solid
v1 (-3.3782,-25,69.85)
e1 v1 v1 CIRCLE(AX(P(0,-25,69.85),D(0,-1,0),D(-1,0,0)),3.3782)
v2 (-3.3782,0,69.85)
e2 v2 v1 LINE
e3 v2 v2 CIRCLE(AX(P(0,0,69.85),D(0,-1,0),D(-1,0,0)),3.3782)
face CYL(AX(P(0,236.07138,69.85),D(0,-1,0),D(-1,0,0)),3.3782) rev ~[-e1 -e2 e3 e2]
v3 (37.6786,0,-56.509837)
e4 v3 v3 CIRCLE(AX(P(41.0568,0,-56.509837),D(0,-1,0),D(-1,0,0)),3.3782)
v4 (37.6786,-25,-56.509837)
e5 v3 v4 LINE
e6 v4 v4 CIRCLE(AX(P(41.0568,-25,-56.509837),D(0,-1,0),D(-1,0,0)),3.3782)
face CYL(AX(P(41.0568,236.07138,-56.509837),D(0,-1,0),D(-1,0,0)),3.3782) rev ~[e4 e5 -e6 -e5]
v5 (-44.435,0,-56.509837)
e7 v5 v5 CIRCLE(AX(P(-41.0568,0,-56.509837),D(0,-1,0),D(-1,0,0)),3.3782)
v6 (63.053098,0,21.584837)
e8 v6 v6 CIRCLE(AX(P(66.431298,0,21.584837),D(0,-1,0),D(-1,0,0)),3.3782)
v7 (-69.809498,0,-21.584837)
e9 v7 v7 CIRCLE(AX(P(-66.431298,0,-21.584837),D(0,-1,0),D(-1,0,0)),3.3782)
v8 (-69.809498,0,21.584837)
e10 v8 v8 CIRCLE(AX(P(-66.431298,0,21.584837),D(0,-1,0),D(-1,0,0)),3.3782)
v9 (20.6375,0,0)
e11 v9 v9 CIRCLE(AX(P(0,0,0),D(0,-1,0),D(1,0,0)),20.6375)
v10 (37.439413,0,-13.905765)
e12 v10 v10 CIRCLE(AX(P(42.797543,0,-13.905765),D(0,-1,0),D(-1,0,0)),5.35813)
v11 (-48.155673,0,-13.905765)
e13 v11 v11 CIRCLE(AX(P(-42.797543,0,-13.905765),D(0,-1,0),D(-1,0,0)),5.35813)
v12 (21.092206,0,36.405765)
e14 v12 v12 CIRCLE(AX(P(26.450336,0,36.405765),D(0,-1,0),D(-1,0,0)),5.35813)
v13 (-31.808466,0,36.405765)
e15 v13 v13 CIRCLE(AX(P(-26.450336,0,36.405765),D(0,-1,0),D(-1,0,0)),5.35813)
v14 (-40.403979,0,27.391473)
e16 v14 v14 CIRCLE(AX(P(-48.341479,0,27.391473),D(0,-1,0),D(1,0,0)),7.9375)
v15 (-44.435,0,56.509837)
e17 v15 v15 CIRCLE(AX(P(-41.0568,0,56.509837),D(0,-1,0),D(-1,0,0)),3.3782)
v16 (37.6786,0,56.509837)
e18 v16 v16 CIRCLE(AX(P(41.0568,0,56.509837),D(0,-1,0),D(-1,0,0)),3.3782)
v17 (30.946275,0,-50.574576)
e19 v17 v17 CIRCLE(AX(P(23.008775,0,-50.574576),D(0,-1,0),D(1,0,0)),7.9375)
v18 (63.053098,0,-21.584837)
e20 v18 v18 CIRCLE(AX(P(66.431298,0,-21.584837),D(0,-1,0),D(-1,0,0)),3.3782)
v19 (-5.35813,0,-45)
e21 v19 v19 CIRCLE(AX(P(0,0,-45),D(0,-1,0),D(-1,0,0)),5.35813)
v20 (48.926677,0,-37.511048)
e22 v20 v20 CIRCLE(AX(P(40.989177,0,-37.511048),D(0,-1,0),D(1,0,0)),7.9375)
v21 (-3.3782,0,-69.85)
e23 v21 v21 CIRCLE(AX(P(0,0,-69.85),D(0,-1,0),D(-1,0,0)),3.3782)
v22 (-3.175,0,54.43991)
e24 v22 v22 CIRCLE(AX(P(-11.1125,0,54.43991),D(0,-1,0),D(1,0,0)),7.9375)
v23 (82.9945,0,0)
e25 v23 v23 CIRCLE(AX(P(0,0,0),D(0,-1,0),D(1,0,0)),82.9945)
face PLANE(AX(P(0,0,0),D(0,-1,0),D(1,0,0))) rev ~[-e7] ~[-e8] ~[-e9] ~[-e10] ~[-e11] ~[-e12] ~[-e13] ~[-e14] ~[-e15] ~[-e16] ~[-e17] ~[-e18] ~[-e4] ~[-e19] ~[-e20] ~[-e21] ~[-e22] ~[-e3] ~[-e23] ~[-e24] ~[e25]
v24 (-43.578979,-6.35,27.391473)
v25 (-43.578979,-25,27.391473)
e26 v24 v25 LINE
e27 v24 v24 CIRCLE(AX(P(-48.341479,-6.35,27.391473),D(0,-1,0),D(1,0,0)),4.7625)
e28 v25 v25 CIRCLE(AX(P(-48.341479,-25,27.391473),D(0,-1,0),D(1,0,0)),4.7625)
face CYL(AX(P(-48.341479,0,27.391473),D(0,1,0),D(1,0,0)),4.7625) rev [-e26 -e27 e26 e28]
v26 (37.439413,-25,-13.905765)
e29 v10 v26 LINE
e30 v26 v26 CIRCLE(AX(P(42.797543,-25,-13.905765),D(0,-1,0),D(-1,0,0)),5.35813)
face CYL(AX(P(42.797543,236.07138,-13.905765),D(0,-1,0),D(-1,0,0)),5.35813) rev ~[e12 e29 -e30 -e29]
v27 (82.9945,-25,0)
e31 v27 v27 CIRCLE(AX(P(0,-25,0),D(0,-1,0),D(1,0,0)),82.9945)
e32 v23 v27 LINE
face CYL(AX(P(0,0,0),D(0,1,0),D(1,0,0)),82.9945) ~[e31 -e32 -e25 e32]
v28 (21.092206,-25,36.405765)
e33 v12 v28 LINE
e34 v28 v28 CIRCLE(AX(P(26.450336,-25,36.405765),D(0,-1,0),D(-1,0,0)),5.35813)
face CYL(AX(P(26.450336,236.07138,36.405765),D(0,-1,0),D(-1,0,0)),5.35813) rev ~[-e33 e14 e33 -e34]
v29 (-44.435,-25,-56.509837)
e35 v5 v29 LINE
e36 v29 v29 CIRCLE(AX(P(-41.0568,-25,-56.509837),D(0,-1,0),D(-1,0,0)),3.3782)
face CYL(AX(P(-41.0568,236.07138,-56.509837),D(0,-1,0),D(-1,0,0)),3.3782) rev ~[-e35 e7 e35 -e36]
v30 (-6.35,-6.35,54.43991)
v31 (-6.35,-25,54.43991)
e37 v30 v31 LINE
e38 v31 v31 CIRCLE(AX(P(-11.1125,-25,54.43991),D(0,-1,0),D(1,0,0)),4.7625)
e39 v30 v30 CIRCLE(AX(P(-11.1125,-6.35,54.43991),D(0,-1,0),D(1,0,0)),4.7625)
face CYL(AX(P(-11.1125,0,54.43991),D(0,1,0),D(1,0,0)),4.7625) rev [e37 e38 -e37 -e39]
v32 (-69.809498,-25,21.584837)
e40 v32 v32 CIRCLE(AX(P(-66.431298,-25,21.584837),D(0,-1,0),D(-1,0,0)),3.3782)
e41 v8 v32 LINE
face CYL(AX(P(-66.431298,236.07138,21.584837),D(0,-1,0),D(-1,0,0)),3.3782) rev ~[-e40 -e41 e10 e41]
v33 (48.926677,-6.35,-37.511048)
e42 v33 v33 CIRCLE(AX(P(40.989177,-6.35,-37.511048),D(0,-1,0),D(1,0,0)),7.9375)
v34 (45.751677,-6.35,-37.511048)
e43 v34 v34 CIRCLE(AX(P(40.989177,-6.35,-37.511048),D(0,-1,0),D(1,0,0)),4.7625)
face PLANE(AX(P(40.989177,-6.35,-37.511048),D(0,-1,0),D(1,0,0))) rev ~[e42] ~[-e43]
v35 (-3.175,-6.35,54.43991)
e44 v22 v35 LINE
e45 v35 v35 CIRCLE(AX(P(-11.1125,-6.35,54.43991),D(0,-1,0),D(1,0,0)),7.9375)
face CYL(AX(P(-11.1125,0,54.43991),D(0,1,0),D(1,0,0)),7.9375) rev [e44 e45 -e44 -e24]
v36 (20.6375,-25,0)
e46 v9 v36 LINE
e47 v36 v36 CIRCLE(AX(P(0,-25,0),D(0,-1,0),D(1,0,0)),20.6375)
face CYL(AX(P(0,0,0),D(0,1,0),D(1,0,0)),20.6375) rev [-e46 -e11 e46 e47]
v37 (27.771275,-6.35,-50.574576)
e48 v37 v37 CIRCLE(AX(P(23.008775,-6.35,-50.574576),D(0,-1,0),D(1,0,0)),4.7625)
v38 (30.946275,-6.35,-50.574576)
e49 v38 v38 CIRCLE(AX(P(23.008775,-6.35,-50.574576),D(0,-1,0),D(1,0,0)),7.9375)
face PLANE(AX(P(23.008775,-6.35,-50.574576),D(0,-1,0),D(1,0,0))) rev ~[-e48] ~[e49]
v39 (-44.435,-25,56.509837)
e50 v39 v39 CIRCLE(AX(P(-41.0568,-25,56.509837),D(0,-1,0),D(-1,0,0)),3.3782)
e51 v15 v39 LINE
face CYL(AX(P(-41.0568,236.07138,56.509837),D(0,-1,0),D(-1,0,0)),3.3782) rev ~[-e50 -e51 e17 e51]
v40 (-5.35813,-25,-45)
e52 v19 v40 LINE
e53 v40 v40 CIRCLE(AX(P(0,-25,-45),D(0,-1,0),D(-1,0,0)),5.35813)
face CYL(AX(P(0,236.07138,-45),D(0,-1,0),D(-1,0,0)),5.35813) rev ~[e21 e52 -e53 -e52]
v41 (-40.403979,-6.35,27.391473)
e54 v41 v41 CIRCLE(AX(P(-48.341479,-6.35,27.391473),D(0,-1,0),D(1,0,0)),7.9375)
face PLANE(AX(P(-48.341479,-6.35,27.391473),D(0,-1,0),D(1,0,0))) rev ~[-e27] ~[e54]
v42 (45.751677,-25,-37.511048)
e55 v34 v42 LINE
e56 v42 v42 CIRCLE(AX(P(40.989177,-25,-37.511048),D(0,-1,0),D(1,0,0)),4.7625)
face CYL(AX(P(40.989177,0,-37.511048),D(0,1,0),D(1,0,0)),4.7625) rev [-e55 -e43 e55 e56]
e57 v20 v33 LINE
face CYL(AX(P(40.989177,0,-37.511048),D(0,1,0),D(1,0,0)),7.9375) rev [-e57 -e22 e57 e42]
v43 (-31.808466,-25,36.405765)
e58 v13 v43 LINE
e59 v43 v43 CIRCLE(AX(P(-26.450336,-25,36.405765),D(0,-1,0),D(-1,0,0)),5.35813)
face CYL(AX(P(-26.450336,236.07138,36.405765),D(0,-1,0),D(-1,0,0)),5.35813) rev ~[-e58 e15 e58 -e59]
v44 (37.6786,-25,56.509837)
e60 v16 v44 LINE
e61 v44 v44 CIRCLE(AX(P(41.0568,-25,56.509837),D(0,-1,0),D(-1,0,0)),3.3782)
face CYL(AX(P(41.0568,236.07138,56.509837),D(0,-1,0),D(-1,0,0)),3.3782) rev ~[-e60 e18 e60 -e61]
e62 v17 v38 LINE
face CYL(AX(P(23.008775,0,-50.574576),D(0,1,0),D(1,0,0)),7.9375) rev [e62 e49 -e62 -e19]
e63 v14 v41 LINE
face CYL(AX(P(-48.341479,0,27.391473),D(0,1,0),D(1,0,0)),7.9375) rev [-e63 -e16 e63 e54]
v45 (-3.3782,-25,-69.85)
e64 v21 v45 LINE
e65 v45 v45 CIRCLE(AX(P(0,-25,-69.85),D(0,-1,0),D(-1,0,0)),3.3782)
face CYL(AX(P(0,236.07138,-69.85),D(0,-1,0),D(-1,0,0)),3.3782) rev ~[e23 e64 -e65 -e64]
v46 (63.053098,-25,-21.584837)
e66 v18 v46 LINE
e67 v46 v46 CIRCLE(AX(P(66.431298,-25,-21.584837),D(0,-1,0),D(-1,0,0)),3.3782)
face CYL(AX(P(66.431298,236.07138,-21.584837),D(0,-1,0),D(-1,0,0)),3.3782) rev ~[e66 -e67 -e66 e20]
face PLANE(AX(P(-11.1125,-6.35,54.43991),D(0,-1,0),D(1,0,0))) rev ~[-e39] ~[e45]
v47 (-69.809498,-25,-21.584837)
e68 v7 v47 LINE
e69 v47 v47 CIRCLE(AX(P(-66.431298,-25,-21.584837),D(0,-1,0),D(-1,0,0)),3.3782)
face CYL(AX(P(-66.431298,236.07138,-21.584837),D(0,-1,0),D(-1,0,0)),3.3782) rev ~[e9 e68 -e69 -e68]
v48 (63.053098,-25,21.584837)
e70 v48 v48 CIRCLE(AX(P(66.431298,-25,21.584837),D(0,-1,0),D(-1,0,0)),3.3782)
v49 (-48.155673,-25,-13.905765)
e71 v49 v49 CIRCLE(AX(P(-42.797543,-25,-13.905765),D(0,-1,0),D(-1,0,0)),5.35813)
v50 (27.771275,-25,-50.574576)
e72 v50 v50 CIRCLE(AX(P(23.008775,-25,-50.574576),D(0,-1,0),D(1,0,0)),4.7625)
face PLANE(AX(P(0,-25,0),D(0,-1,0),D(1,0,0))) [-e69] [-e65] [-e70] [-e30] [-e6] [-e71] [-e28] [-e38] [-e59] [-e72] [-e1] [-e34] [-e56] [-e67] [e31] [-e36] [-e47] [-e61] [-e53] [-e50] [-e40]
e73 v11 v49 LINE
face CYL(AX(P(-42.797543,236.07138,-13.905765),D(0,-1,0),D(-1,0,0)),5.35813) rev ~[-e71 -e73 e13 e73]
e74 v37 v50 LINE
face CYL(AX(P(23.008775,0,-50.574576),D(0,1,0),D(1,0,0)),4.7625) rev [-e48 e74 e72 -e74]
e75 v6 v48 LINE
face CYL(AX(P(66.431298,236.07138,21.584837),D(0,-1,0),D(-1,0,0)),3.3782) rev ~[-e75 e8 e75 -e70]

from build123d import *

# Parameters (mm, degrees)
F0_R     = 82.9945
F0_R_2   = 7.9375
F0_R_3   = 20.6375
F0_R_4   = 4.7625
F1_DEPTH = 25
F2_D     = 6.7564
F3_DEPTH = 6.35
F5_D     = 10.71626


# Not quite as in the source:
# - a feature names something its author has since deleted; it is built from what else it names


with BuildPart() as f1:
    # F0 (on Front) → F1 (new body)
    with BuildSketch(Plane.XZ):
        Circle(F0_R)
        with Locations((-23.0087746099, -50.5745756008)):
            Circle(F0_R_2, mode=Mode.SUBTRACT)
        with Locations((-40.9891773098, -37.5110483686)):
            Circle(F0_R_2, mode=Mode.SUBTRACT)
        with Locations((23.0087746099, -50.5745756008)):
            Circle(F0_R_2, mode=Mode.SUBTRACT)
        with Locations((40.9891773098, -37.5110483686)):
            Circle(F0_R_2, mode=Mode.SUBTRACT)
        with Locations((-55.2093820582, 6.2542416807)):
            Circle(F0_R_2, mode=Mode.SUBTRACT)
        with Locations((-48.3414793582, 27.3914727554)):
            Circle(F0_R_2, mode=Mode.SUBTRACT)
        with Locations((-11.1125, 54.4399095334)):
            Circle(F0_R_2, mode=Mode.SUBTRACT)
        Circle(F0_R_3, mode=Mode.SUBTRACT)
        with Locations((55.2093820582, 6.2542416807)):
            Circle(F0_R_2, mode=Mode.SUBTRACT)
        with Locations((48.3414793582, 27.3914727554)):
            Circle(F0_R_2, mode=Mode.SUBTRACT)
        with Locations((11.1125, 54.4399095334)):
            Circle(F0_R_2, mode=Mode.SUBTRACT)
        with Locations((-48.3414793582, 27.3914727554)):
            Circle(F0_R_2)
        with Locations((-48.3414793582, 27.3914727554)):
            Circle(F0_R_4, mode=Mode.SUBTRACT)
        with Locations((-11.1125, 54.4399095334)):
            Circle(F0_R_2)
        with Locations((-11.1125, 54.4399095334)):
            Circle(F0_R_4, mode=Mode.SUBTRACT)
        with Locations((-55.2093820582, 6.2542416807)):
            Circle(F0_R_2)
        with Locations((-55.2093820582, 6.2542416807)):
            Circle(F0_R_4, mode=Mode.SUBTRACT)
        with Locations((-40.9891773098, -37.5110483686)):
            Circle(F0_R_2)
        with Locations((-40.9891773098, -37.5110483686)):
            Circle(F0_R_4, mode=Mode.SUBTRACT)
        with Locations((-23.0087746099, -50.5745756008)):
            Circle(F0_R_2)
        with Locations((-23.0087746099, -50.5745756008)):
            Circle(F0_R_4, mode=Mode.SUBTRACT)
        with Locations((55.2093820582, 6.2542416807)):
            Circle(F0_R_2)
        with Locations((55.2093820582, 6.2542416807)):
            Circle(F0_R_4, mode=Mode.SUBTRACT)
        with Locations((48.3414793582, 27.3914727554)):
            Circle(F0_R_2)
        with Locations((48.3414793582, 27.3914727554)):
            Circle(F0_R_4, mode=Mode.SUBTRACT)
        with Locations((11.1125, 54.4399095334)):
            Circle(F0_R_2)
        with Locations((11.1125, 54.4399095334)):
            Circle(F0_R_4, mode=Mode.SUBTRACT)
        with Locations((23.0087746099, -50.5745756008)):
            Circle(F0_R_2)
        with Locations((23.0087746099, -50.5745756008)):
            Circle(F0_R_4, mode=Mode.SUBTRACT)
        with Locations((40.9891773098, -37.5110483686)):
            Circle(F0_R_2)
        with Locations((40.9891773098, -37.5110483686)):
            Circle(F0_R_4, mode=Mode.SUBTRACT)
        with Locations((-55.2093820582, 6.2542416807)):
            Circle(F0_R_4)
        with Locations((-40.9891773098, -37.5110483686)):
            Circle(F0_R_4)
        with Locations((-23.0087746099, -50.5745756008)):
            Circle(F0_R_4)
        with Locations((55.2093820582, 6.2542416807)):
            Circle(F0_R_4)
        with Locations((48.3414793582, 27.3914727554)):
            Circle(F0_R_4)
        with Locations((11.1125, 54.4399095334)):
            Circle(F0_R_4)
    extrude(amount=F1_DEPTH)

    # F2 (through all)
    with Locations(Plane(origin=(0, 0, 0), x_dir=(1, 0, 0), z_dir=(0, 1, 0))):
        with Locations((0, -69.85), (41.0567998726, -56.5098370571), (66.4312976632, -21.5848370571), (66.4312976632, 21.5848370571), (41.0567998726, 56.5098370571), (0, 69.85), (-41.0567998726, 56.5098370571), (-66.4312976632, 21.5848370571), (-66.4312976632, -21.5848370571), (-41.0567998726, -56.5098370571)):
            Hole(F2_D / 2)

    # F0 (on Front) → F3 (cut)
    with BuildSketch(Plane.XZ):
        with Locations((-11.1125, 54.4399095334)):
            Circle(F0_R_2)
        with Locations((-11.1125, 54.4399095334)):
            Circle(F0_R_4, mode=Mode.SUBTRACT)
        with Locations((-48.3414793582, 27.3914727554)):
            Circle(F0_R_2)
        with Locations((-48.3414793582, 27.3914727554)):
            Circle(F0_R_4, mode=Mode.SUBTRACT)
        with Locations((40.9891773098, -37.5110483686)):
            Circle(F0_R_2)
        with Locations((40.9891773098, -37.5110483686)):
            Circle(F0_R_4, mode=Mode.SUBTRACT)
        with Locations((23.0087746099, -50.5745756008)):
            Circle(F0_R_2)
        with Locations((23.0087746099, -50.5745756008)):
            Circle(F0_R_4, mode=Mode.SUBTRACT)
    extrude(amount=F3_DEPTH, mode=Mode.SUBTRACT)

    # F5 (through all)
    with Locations(Plane(origin=(0, 0, 0), x_dir=(1, 0, 0), z_dir=(0, 1, 0))):
        with Locations((0, 45), (42.7975432333, 13.9057647469), (26.4503363532, -36.4057647469), (-26.4503363532, -36.4057647469), (-42.7975432333, 13.9057647469)):
            Hole(F5_D / 2)


solid = f1.part
